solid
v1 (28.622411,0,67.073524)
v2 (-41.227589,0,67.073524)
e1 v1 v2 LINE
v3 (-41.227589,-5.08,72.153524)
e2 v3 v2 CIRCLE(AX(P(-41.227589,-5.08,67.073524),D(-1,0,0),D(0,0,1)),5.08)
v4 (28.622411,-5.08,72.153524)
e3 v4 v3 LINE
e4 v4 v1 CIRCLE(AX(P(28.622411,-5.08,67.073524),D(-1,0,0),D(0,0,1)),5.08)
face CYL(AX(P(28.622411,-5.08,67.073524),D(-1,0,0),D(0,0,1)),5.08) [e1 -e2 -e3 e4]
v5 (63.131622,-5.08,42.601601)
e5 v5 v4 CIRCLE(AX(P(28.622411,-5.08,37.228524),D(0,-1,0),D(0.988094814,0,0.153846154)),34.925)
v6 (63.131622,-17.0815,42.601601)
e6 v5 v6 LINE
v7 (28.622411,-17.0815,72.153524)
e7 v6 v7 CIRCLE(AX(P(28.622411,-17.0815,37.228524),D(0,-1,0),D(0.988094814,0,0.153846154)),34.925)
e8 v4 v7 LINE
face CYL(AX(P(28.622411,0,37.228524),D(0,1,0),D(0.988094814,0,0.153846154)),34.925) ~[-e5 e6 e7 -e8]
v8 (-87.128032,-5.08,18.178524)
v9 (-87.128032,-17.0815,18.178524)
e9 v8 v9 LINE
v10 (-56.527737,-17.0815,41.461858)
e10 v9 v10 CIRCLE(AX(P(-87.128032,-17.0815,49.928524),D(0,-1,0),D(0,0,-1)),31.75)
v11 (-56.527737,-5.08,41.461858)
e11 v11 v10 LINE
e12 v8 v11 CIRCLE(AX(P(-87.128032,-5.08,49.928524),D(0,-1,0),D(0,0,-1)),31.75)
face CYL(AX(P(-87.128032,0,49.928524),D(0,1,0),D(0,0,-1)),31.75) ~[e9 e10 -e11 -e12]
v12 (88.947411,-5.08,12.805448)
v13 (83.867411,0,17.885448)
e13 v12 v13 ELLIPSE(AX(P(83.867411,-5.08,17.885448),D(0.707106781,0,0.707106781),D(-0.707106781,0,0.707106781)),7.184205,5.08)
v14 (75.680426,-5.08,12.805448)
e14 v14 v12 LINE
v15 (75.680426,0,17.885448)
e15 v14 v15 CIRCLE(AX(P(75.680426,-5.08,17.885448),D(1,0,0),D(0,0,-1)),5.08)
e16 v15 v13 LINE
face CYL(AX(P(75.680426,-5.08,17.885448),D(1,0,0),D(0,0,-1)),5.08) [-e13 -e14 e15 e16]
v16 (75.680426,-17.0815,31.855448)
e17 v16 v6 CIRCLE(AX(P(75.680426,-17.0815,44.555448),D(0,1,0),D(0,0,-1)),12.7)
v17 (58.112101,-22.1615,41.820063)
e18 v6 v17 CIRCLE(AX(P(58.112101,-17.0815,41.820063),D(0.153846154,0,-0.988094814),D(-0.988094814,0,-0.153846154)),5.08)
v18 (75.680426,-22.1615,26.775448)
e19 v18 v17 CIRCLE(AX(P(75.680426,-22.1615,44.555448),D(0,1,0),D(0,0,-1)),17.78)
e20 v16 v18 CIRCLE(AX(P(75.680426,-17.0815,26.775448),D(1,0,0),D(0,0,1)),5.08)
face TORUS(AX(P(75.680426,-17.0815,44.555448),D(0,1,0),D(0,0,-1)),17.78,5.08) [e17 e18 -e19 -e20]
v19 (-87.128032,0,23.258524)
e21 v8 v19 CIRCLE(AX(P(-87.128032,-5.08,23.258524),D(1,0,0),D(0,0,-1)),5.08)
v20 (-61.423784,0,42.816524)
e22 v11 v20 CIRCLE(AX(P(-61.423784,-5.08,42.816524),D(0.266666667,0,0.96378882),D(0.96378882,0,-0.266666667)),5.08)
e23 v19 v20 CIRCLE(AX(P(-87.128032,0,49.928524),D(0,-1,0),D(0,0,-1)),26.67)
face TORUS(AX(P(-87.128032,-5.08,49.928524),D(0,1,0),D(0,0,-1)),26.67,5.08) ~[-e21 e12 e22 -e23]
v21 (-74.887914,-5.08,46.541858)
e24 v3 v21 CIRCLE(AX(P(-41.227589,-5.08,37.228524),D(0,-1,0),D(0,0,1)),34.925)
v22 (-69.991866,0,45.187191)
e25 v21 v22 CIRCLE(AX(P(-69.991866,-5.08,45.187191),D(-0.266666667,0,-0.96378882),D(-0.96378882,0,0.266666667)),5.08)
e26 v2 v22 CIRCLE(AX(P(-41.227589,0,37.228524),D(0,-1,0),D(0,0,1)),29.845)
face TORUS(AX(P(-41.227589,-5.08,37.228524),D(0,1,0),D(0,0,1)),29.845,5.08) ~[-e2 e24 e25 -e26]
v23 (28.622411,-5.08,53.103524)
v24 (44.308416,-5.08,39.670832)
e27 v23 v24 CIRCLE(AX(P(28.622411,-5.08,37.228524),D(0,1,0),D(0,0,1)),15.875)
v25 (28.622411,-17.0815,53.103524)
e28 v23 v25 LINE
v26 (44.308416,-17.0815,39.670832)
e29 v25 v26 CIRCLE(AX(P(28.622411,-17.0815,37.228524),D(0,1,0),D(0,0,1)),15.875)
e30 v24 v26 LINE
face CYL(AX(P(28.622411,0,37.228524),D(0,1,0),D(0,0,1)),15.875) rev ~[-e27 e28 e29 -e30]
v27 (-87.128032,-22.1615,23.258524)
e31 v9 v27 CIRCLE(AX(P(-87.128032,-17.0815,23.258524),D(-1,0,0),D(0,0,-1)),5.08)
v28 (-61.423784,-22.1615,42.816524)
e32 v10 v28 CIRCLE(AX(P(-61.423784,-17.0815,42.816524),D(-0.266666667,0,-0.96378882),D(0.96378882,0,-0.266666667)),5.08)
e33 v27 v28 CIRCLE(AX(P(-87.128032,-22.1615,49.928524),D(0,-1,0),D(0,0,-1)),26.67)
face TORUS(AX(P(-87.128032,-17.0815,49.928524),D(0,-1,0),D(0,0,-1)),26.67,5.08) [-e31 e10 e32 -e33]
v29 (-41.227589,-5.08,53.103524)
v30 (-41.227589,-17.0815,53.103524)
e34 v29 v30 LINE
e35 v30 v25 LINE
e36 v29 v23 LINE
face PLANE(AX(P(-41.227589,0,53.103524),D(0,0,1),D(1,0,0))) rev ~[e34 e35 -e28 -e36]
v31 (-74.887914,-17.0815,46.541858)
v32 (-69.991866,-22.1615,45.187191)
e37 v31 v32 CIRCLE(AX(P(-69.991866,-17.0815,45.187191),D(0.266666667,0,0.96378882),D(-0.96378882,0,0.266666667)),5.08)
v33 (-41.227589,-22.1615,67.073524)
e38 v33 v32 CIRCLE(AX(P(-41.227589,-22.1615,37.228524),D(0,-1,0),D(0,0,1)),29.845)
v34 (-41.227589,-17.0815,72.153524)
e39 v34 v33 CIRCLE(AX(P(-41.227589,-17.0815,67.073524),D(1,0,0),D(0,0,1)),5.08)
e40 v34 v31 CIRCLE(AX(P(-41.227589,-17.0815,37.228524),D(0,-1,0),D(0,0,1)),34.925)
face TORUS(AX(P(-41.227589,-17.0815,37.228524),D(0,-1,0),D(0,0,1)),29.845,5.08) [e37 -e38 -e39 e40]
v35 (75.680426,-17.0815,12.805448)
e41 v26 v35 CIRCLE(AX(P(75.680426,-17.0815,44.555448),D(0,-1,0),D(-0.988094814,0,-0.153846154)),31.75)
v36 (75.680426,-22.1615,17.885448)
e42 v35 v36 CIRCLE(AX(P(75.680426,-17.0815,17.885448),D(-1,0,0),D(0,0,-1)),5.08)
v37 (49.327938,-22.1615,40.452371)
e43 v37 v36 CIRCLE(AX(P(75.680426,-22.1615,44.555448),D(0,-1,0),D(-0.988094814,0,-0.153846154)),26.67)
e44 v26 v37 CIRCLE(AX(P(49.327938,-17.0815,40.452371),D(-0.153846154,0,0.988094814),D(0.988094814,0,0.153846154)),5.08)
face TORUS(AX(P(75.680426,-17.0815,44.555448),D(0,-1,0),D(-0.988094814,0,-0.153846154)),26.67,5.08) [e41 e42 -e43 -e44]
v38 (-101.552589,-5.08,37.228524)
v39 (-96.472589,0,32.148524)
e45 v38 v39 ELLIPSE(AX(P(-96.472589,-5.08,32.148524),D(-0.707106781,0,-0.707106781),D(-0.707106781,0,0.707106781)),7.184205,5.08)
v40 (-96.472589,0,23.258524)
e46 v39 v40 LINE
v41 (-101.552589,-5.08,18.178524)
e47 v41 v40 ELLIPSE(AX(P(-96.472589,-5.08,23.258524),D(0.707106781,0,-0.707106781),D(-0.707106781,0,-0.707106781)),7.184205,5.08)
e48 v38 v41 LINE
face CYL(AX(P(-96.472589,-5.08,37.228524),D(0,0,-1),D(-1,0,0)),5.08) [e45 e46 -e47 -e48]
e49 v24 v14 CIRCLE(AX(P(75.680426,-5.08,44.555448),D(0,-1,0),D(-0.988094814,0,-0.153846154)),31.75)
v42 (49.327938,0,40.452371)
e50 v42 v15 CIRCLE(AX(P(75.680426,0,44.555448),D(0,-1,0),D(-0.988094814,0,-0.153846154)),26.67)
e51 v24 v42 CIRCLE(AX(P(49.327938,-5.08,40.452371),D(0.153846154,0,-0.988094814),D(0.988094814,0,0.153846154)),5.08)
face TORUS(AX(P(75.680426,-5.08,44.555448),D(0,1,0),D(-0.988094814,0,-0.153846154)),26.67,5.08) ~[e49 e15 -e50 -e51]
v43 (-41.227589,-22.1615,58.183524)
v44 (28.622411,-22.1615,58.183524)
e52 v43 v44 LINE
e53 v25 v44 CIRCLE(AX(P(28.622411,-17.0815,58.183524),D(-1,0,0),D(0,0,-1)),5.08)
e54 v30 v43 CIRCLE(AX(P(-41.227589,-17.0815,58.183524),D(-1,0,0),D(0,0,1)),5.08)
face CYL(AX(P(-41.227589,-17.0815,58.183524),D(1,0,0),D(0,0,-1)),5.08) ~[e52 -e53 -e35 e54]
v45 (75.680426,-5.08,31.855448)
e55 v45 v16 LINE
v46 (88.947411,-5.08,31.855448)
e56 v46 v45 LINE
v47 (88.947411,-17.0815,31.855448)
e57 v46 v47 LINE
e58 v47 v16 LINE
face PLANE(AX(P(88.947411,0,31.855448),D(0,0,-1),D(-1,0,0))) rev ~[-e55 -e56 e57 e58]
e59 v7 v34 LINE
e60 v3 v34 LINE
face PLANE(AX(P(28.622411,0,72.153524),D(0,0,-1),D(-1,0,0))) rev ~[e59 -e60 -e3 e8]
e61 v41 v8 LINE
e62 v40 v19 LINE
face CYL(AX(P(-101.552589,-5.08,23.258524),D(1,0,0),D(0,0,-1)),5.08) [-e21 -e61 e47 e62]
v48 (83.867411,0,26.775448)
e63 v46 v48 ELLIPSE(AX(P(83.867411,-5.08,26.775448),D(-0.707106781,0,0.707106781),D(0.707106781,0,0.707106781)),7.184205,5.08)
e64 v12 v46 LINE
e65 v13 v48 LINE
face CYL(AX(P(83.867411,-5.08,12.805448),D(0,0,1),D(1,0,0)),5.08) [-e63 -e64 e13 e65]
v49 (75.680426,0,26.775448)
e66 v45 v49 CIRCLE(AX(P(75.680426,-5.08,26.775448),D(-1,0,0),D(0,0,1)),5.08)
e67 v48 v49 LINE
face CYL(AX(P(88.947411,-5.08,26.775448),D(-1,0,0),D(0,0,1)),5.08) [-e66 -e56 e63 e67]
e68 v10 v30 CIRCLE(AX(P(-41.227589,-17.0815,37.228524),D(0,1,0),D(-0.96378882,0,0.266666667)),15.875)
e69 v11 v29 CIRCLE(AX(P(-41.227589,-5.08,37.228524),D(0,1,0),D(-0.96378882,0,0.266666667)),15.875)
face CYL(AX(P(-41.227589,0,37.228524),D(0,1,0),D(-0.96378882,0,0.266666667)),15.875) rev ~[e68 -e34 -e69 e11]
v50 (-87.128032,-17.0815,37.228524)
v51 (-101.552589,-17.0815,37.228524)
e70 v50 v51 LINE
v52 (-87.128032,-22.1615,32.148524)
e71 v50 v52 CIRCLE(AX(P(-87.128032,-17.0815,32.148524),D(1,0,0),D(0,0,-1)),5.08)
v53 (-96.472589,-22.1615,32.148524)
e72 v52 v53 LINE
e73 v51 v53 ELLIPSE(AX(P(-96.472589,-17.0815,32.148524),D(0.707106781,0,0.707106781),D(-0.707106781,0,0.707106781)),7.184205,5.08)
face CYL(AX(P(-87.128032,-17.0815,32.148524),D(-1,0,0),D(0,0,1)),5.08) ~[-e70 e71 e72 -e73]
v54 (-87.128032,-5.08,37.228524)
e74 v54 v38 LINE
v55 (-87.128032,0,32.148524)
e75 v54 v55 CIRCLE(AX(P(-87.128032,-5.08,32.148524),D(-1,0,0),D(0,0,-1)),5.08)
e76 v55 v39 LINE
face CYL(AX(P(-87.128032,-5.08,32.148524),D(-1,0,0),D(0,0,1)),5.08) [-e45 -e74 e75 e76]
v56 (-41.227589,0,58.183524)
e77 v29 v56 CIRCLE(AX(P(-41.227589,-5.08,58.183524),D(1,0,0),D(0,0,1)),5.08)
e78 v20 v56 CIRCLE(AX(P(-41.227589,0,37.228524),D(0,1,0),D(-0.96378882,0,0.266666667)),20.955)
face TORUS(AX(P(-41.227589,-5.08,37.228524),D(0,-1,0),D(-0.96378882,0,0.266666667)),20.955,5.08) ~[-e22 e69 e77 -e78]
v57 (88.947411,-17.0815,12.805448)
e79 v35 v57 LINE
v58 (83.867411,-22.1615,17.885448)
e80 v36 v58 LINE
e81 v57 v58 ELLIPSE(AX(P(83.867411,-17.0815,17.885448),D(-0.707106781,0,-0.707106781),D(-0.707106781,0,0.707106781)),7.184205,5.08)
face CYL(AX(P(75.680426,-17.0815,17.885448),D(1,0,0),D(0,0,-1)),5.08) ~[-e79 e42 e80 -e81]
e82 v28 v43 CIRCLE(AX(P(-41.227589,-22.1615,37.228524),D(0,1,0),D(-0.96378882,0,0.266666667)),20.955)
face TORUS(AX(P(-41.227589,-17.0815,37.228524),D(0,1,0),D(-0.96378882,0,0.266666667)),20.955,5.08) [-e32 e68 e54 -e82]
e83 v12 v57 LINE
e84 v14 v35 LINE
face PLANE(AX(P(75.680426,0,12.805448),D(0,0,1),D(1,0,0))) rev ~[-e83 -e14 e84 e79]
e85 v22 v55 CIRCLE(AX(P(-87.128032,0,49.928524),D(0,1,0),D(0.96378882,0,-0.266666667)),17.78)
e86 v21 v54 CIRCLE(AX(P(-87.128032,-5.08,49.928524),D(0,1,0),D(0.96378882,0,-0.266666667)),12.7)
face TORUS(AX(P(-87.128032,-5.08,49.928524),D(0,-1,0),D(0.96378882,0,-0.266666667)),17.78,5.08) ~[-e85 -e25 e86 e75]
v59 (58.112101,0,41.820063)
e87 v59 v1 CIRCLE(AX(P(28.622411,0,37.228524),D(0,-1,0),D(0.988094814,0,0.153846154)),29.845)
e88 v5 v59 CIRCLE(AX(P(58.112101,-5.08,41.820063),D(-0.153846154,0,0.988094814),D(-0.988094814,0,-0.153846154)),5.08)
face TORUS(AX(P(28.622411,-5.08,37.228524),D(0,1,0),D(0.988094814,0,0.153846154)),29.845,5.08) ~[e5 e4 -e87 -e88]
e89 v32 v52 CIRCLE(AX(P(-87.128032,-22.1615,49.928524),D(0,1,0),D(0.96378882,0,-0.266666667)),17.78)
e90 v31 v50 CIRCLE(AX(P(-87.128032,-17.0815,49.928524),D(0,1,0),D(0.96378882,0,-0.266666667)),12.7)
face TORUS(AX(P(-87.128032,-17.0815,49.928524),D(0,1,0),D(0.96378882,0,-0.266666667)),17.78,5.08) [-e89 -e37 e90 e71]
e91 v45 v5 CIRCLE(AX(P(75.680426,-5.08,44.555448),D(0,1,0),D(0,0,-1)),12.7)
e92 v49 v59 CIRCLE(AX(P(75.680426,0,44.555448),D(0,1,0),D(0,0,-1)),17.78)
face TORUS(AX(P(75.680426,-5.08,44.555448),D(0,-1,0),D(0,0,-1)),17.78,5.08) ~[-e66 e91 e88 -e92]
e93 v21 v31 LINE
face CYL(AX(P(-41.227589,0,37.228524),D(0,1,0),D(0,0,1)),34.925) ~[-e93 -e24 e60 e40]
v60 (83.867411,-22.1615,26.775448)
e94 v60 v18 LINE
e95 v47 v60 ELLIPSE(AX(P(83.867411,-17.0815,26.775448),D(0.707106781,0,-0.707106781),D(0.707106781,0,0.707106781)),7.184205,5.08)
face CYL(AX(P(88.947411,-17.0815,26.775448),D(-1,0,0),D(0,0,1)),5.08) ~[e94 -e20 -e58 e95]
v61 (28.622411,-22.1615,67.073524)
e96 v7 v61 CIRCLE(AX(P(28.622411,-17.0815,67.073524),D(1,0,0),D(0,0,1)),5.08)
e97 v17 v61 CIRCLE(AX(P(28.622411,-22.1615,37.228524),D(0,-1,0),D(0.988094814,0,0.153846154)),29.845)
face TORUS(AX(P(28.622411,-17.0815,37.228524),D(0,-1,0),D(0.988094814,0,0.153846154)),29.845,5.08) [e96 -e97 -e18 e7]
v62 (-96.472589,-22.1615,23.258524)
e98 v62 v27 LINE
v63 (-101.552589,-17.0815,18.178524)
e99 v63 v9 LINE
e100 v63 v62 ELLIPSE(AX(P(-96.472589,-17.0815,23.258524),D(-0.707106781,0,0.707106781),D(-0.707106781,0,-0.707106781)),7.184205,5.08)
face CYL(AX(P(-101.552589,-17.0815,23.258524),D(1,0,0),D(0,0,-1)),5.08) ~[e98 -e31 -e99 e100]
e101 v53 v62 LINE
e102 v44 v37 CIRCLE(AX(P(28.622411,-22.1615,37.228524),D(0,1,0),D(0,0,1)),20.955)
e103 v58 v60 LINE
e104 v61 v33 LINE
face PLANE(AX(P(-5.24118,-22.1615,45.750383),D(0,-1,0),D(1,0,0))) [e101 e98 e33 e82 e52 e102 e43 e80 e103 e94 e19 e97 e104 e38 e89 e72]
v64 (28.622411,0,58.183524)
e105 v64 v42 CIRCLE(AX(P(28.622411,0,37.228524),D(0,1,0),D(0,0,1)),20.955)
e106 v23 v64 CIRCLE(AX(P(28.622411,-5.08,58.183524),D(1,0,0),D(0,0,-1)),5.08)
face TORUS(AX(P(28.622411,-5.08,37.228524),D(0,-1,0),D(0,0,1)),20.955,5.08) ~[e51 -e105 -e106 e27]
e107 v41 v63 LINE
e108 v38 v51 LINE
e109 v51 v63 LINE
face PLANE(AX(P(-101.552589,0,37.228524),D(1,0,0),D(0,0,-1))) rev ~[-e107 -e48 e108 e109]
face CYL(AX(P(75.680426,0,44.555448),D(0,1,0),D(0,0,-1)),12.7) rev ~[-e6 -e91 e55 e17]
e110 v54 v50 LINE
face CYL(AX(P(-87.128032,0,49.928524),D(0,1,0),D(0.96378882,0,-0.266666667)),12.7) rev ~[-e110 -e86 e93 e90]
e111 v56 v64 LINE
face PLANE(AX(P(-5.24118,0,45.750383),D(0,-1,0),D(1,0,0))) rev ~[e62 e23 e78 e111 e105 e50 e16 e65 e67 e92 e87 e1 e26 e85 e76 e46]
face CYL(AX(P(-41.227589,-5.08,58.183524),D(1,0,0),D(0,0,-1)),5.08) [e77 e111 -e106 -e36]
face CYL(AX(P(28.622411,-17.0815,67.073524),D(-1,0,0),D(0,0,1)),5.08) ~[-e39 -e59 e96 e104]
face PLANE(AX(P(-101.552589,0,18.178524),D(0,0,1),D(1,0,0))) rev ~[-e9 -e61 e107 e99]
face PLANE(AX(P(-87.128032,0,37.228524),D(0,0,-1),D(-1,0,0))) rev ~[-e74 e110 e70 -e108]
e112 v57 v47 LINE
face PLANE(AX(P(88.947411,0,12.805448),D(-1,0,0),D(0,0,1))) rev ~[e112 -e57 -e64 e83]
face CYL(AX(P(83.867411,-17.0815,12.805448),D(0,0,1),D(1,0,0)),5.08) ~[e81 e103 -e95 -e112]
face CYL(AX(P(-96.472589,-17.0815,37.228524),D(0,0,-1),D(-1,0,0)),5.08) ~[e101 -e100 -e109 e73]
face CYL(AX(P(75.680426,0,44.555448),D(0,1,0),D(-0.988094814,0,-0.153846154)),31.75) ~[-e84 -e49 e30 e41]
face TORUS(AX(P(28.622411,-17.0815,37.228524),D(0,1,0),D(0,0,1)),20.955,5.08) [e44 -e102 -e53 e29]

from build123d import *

# Parameters (mm, degrees)
F1_DEPTH = 22.1615
F2_R     = 5.08


# Not quite as in the source:
# - a feature names something its author has since deleted; it is built from what else it names


with BuildPart() as f1:
    # F0 (on Front) → F1 (new body)
    with BuildSketch(Plane.XZ):
        with BuildLine():
            Line((28.6224108991, 72.15352447), (-41.2275891009, 72.15352447))
            ThreePointArc((-41.2275891009, 72.15352447), (-62.3757268242, 65.0226226894), (-74.8879136272, 46.5418578033))
            ThreePointArc((-74.8879136272, 46.5418578033), (-79.4377997374, 39.8215796629), (-87.1280316368, 37.22852447))
            Line((-87.1280316368, 37.22852447), (-101.5525891009, 37.22852447))
            Line((-101.5525891009, 37.22852447), (-101.5525891009, 18.17852447))
            Line((-101.5525891009, 18.17852447), (-87.1280316368, 18.17852447))
            ThreePointArc((-87.1280316368, 18.17852447), (-67.9024518883, 24.6611624523), (-56.5277366129, 41.4618578033))
            ThreePointArc((-56.5277366129, 41.4618578033), (-50.8403789751, 49.8622054788), (-41.2275891009, 53.10352447))
            Line((-41.2275891009, 53.10352447), (28.6224108991, 53.10352447))
            ThreePointArc((28.6224108991, 53.10352447), (38.9482036141, 49.2864525593), (44.3084160673, 39.6708321623))
            ThreePointArc((44.3084160673, 39.6708321623), (55.0288409738, 20.4395913682), (75.6804264037, 12.8054475469))
            Line((75.6804264037, 12.8054475469), (88.9474108991, 12.8054475469))
            Line((88.9474108991, 12.8054475469), (88.9474108991, 31.8554475469))
            Line((88.9474108991, 31.8554475469), (75.6804264037, 31.8554475469))
            ThreePointArc((75.6804264037, 31.8554475469), (67.4197922317, 34.9091050754), (63.1316222691, 42.601601393))
            ThreePointArc((63.1316222691, 42.601601393), (51.3391548721, 63.7559662665), (28.6224108991, 72.15352447))
        make_face()
    extrude(amount=F1_DEPTH)

    # F2
    f2_edges = [f1.edges().sort_by_distance(p)[0] for p in [
        (88.947411, -22.1615, 22.330448),
        (82.313919, -22.1615, 31.855448),
        (67.419792, -22.1615, 34.909105),
        (51.339155, -22.1615, 63.755966),
        (-6.302589, -22.1615, 72.153524),
        (-62.375727, -22.1615, 65.022623),
        (-79.4378, -22.1615, 39.82158),
        (-94.34031, -22.1615, 37.228524),
        (-101.552589, -22.1615, 27.703524),
        (-94.34031, -22.1615, 18.178524),
        (-67.902452, -22.1615, 24.661162),
        (-50.840379, -22.1615, 49.862205),
        (-6.302589, -22.1615, 53.103524),
        (38.948204, -22.1615, 49.286453),
        (55.028841, -22.1615, 20.439591),
        (82.313919, -22.1615, 12.805448),
        (88.947411, 0, 22.330448),
        (82.313919, 0, 31.855448),
        (67.419792, 0, 34.909105),
        (51.339155, 0, 63.755966),
        (-6.302589, 0, 72.153524),
        (-62.375727, 0, 65.022623),
        (-79.4378, 0, 39.82158),
        (-94.34031, 0, 37.228524),
        (-101.552589, 0, 27.703524),
        (-94.34031, 0, 18.178524),
        (-67.902452, 0, 24.661162),
        (-50.840379, 0, 49.862205),
        (-6.302589, 0, 53.103524),
        (38.948204, 0, 49.286453),
        (55.028841, 0, 20.439591),
        (82.313919, 0, 12.805448),
    ]]
    fillet(f2_edges, radius=F2_R)


solid = f1.part
